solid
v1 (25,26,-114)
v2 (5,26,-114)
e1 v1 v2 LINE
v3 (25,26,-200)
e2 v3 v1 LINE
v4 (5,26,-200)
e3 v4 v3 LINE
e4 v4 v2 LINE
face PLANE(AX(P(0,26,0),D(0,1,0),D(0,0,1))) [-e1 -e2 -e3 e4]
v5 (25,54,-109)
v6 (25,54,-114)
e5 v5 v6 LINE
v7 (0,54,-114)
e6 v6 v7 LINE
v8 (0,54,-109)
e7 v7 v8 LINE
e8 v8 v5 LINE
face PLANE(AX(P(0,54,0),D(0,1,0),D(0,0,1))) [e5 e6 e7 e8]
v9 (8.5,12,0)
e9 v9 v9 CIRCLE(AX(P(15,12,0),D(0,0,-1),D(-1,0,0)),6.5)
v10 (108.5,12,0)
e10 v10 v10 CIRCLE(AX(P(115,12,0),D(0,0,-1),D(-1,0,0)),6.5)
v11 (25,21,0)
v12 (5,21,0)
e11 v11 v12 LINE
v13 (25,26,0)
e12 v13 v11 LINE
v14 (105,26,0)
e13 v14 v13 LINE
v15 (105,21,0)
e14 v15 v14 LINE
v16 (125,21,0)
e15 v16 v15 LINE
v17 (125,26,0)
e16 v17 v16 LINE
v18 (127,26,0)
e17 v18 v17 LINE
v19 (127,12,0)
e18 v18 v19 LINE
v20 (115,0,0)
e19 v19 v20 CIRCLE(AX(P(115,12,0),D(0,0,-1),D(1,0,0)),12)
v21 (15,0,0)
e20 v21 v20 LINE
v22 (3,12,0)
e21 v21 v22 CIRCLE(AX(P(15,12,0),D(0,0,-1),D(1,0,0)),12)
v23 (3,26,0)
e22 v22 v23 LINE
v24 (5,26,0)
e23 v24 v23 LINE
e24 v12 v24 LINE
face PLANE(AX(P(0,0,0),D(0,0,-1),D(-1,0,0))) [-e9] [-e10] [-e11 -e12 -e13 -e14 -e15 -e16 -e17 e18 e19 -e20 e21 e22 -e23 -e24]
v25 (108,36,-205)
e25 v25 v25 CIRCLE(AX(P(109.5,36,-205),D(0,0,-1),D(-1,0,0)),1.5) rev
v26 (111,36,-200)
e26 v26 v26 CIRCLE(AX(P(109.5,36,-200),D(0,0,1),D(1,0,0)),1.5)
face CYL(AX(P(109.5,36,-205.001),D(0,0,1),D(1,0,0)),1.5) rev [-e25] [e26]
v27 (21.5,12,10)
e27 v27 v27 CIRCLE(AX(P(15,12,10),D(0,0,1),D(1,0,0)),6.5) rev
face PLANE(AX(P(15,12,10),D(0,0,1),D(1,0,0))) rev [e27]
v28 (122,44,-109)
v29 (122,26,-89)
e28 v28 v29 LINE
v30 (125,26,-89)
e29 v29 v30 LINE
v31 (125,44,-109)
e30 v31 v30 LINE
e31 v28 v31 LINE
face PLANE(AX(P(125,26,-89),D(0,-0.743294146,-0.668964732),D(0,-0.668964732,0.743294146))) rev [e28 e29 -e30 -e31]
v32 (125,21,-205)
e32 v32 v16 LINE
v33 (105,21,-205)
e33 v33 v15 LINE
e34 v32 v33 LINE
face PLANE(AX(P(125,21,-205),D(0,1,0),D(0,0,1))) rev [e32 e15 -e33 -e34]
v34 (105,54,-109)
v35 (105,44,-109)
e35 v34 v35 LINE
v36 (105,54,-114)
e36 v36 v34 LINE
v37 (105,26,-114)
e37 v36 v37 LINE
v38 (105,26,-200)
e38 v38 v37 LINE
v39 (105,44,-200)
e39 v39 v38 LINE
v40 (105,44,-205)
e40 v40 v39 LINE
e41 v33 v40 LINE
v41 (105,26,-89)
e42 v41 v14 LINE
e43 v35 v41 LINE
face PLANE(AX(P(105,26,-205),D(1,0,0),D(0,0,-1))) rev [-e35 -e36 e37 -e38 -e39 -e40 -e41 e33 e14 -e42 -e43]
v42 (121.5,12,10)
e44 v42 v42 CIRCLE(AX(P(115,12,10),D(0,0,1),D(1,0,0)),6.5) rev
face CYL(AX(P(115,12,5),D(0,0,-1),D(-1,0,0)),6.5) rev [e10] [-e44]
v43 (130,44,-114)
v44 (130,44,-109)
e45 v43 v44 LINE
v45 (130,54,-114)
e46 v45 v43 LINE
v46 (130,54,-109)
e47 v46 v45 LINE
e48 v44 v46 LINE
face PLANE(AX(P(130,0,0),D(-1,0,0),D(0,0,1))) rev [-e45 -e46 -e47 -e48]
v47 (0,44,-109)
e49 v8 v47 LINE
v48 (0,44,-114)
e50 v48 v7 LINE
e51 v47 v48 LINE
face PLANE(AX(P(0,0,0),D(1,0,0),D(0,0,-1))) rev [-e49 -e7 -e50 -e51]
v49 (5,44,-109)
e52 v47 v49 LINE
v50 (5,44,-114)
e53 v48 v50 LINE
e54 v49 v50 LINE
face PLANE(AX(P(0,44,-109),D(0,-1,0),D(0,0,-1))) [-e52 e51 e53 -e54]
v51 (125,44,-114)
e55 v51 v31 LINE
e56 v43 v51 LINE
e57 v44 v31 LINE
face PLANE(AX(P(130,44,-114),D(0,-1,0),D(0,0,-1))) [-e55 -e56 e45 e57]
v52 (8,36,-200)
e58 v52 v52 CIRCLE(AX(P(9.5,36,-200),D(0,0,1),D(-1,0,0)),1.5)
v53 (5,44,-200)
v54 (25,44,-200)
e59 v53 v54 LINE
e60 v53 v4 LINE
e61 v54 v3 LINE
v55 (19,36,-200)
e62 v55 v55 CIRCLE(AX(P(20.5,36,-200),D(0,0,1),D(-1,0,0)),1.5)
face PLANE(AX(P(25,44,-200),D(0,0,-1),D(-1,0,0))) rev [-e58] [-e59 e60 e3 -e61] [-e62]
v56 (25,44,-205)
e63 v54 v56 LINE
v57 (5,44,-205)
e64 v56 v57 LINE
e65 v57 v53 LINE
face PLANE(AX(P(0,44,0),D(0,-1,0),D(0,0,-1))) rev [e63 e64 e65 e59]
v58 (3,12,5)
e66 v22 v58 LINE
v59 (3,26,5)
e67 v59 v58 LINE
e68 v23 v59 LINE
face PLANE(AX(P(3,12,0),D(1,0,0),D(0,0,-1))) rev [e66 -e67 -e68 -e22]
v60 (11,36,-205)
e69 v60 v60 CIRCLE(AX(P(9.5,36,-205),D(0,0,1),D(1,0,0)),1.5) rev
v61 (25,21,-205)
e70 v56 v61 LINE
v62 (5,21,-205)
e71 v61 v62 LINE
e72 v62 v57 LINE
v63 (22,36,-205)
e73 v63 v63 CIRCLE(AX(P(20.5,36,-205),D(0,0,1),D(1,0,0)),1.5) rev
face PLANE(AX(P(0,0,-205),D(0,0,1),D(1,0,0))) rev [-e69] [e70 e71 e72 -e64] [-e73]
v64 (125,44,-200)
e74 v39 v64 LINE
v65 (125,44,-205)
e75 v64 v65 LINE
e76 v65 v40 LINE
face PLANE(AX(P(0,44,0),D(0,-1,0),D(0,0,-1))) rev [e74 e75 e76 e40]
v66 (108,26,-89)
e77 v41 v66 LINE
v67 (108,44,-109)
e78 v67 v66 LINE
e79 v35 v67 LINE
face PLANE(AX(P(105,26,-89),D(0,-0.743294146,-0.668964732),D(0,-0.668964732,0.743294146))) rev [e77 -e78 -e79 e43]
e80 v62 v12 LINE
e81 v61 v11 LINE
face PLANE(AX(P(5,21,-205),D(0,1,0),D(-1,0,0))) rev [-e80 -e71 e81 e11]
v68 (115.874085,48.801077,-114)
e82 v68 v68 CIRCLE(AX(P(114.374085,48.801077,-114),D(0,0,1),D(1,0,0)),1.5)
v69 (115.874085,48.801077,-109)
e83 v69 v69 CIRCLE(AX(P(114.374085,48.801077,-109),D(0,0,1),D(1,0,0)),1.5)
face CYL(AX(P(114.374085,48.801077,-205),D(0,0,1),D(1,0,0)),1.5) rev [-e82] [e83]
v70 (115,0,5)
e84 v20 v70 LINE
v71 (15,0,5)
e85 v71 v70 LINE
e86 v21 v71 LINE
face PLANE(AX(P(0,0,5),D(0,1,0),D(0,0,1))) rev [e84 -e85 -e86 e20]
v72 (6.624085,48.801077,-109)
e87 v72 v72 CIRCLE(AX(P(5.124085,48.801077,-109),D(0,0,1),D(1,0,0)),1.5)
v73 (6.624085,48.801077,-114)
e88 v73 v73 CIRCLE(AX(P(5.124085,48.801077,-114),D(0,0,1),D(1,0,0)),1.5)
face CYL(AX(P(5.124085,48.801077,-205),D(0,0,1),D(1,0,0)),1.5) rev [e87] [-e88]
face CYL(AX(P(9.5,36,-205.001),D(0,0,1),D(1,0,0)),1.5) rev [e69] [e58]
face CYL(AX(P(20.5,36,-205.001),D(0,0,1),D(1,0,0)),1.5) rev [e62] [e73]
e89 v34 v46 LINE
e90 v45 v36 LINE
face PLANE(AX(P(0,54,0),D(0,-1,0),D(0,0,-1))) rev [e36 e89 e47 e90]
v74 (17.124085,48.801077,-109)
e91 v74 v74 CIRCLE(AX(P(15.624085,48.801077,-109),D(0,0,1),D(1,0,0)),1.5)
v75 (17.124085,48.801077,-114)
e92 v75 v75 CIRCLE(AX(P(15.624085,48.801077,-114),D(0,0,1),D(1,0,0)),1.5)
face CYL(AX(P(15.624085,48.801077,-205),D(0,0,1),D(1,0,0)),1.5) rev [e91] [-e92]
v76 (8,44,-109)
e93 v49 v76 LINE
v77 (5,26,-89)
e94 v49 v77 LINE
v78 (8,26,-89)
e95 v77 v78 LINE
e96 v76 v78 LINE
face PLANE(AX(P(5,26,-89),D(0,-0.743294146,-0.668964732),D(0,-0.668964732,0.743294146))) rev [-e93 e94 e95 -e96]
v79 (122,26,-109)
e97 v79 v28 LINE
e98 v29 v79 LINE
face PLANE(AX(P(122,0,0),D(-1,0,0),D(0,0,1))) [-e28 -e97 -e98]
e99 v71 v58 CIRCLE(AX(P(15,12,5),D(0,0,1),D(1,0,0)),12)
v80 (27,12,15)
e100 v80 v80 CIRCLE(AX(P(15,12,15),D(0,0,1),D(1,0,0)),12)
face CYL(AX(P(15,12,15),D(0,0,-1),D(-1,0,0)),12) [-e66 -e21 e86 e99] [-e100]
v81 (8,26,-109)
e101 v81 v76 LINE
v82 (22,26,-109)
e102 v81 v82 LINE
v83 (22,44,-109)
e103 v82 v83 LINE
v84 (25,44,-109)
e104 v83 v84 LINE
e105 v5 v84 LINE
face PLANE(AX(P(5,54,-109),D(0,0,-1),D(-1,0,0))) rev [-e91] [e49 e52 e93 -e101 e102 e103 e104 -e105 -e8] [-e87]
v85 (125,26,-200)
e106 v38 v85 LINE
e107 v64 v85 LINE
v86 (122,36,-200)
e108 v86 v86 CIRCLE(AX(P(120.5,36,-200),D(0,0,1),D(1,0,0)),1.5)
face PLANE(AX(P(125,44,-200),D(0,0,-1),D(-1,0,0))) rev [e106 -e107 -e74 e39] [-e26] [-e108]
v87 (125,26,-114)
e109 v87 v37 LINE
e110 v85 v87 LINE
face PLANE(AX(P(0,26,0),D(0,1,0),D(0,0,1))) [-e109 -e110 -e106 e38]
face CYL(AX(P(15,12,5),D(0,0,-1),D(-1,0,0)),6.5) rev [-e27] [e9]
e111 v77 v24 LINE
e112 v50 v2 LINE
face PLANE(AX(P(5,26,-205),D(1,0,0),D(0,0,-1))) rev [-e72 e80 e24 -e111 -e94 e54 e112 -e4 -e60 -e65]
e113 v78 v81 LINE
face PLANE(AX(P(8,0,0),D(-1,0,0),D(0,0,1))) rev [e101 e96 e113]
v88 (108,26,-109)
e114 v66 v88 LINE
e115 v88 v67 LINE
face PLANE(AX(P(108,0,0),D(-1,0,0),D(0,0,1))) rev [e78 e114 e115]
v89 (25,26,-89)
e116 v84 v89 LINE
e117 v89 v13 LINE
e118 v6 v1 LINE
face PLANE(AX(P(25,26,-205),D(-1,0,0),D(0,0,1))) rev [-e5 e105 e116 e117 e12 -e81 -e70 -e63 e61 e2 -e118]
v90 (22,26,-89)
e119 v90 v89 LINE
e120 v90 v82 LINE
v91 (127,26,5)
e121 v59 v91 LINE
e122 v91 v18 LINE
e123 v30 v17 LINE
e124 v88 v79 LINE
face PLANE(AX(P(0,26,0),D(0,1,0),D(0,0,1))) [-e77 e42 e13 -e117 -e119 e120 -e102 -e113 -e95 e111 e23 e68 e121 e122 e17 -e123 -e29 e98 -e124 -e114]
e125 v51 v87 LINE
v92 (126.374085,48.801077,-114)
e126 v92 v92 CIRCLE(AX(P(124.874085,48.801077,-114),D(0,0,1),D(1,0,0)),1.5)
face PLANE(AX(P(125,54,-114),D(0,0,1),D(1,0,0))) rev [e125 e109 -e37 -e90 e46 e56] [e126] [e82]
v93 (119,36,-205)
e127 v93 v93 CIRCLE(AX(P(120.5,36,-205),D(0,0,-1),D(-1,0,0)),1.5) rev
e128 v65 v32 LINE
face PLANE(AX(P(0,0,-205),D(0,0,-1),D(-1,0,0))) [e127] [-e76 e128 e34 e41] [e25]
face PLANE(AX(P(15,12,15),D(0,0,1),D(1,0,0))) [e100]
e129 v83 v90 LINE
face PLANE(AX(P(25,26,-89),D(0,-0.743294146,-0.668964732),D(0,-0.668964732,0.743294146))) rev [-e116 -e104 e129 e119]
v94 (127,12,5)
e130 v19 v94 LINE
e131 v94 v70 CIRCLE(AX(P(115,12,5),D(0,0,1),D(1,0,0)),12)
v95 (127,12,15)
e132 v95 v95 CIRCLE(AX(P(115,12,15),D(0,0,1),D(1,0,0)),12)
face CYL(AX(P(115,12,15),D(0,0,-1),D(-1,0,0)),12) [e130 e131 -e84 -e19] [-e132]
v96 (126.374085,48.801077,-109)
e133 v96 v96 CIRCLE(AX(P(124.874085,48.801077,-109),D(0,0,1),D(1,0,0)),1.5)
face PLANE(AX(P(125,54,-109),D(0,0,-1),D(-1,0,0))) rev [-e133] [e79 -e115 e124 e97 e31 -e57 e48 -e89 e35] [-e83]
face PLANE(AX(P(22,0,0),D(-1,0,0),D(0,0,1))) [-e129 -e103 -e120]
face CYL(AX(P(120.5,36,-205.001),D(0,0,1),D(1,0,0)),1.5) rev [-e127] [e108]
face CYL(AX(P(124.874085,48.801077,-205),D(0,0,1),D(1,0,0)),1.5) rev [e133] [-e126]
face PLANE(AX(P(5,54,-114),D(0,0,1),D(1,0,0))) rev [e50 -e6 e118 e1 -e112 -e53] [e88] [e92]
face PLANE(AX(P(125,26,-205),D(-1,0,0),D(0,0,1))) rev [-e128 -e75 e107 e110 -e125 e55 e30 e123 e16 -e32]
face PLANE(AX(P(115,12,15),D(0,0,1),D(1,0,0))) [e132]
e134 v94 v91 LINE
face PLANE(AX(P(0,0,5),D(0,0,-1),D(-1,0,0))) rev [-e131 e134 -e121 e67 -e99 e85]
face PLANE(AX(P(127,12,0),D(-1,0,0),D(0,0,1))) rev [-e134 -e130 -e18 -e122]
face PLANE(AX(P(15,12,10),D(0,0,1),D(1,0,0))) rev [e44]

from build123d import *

# Parameters (mm, degrees)
SKETCH1_W               = 130
SKETCH1_H               = 24
BOSS_EXTRUDE1_DEPTH     = 5
CUT_EXTRUDE1_DEPTH      = 133.291345144
CUT_EXTRUDE1_DEPTH_BACK = 133.291345144
SKETCH2_R               = 6.5
SKETCH3_R               = 12
BOSS_EXTRUDE3_DEPTH     = 10
SKETCH4_R               = 6.5
CUT_EXTRUDE2_DEPTH      = 5
CUT_EXTRUDE3_DEPTH      = 133.574507353
CUT_EXTRUDE3_DEPTH_BACK = 133.574507353
BOSS_EXTRUDE4_DEPTH     = 2
SKETCH7_W               = 20
SKETCH7_H               = 5
BOSS_EXTRUDE5_DEPTH     = 205
SKETCH8_W               = 20
SKETCH8_H               = 5
BOSS_EXTRUDE6_DEPTH     = 28
SKETCH9_W               = 20
SKETCH9_H               = 5
BOSS_EXTRUDE7_DEPTH     = 18
SKETCH10_W              = 5
SKETCH10_H              = 10
BOSS_EXTRUDE8_DEPTH     = 25
SKETCH11_W              = 5
SKETCH11_H              = 10
BOSS_EXTRUDE9_DEPTH     = 25
SKETCH12_R              = 1.5
CUT_EXTRUDE4_DEPTH      = 188.59530911
THICKEN1_T2             = 3
THICKEN2_START          = 22
THICKEN2_DEPTH          = 3
THICKEN3_START          = 5
THICKEN3_DEPTH          = 3
THICKEN4_START          = 105
THICKEN4_DEPTH          = 3
CUT_EXTRUDE5_REACH      = 258.984
SKETCH14_R              = 1.5


# Read off the part's stored shape, not the designer's step: Thicken2, Thicken3, Thicken4
with BuildPart() as part:
    # Sketch1 → Boss-Extrude1 (new body)
    with BuildSketch(Plane.XY):
        with Locations((65, 12)):
            Rectangle(SKETCH1_W, SKETCH1_H)
    extrude(amount=BOSS_EXTRUDE1_DEPTH)

    # Sketch2 → Cut-Extrude1 (cut, two sides: drawn at the far end of the back side and taken through both)
    with BuildSketch(Plane(origin=(0, 0, 0), x_dir=(-1, 0, 0), z_dir=(0, 0, -1)).offset(-CUT_EXTRUDE1_DEPTH_BACK)):
        with Locations((-15, 12)):
            Circle(SKETCH2_R)
        with Locations((-115, 12)):
            Circle(SKETCH2_R)
    extrude(amount=CUT_EXTRUDE1_DEPTH + CUT_EXTRUDE1_DEPTH_BACK, mode=Mode.SUBTRACT)

    # Sketch3 → Boss-Extrude3 (add)
    with BuildSketch(Plane.XY.offset(5)):
        with Locations(Location((15, 12, 0), (0, 0, 270))):
            Circle(SKETCH3_R)
        with Locations(Location((115, 12, 0), (0, 0, 270))):
            Circle(SKETCH3_R)
    extrude(amount=BOSS_EXTRUDE3_DEPTH)

    # Sketch4 → Cut-Extrude2 (cut)
    with BuildSketch(Plane(origin=(0, 0, 5), x_dir=(-1, 0, 0), z_dir=(0, 0, -1))):
        with Locations((-15, 12)):
            Circle(SKETCH4_R)
        with Locations((-115, 12)):
            Circle(SKETCH4_R)
    extrude(amount=-CUT_EXTRUDE2_DEPTH, mode=Mode.SUBTRACT)

    # Sketch5 → Cut-Extrude3 (cut, two sides: drawn at the far end of the back side and taken through both)
    with BuildSketch(Plane.XY.offset(5).offset(-CUT_EXTRUDE3_DEPTH_BACK)):
        with BuildLine():
            Line((3, 24), (0, 24))
            Line((0, 24), (0, 0))
            Line((0, 0), (15, 0))
            ThreePointArc((15, 0), (6.514718626, 3.514718626), (3, 12))
            Line((3, 12), (3, 24))
        make_face()
        with BuildLine():
            Line((115, 0), (130, 0))
            Line((130, 0), (130, 24))
            Line((130, 24), (127, 24))
            Line((127, 24), (127, 12))
            ThreePointArc((127, 12), (123.485281374, 3.514718626), (115, 0))
        make_face()
    extrude(amount=CUT_EXTRUDE3_DEPTH + CUT_EXTRUDE3_DEPTH_BACK, mode=Mode.SUBTRACT)

    # Sketch6 → Boss-Extrude4 (add)
    with BuildSketch(Plane(origin=(0, 24, 0), x_dir=(1, 0, 0), z_dir=(0, 1, 0))):
        Polygon((127, 0), (3, 0), (3, -5), (15, -5), (115, -5), (127, -5), align=None)
    extrude(amount=BOSS_EXTRUDE4_DEPTH)

    # Sketch7 → Boss-Extrude5 (add)
    with BuildSketch(Plane(origin=(0, 0, 0), x_dir=(-1, 0, 0), z_dir=(0, 0, -1))):
        with Locations((-115, 23.5)):
            Rectangle(SKETCH7_W, SKETCH7_H)
        with Locations((-15, 23.5)):
            Rectangle(SKETCH7_W, SKETCH7_H)
    extrude(amount=BOSS_EXTRUDE5_DEPTH)

    # Sketch8 → Boss-Extrude6 (add)
    with BuildSketch(Plane(origin=(0, 26, 0), x_dir=(1, 0, 0), z_dir=(0, 1, 0))):
        with Locations((115, 111.5)):
            Rectangle(SKETCH8_W, SKETCH8_H)
        with Locations((15, 111.5)):
            Rectangle(SKETCH8_W, SKETCH8_H)
    extrude(amount=BOSS_EXTRUDE6_DEPTH)

    # Sketch9 → Boss-Extrude7 (add)
    with BuildSketch(Plane(origin=(0, 26, 0), x_dir=(1, 0, 0), z_dir=(0, 1, 0))):
        with Locations((115, 202.5)):
            Rectangle(SKETCH9_W, SKETCH9_H)
        with Locations((15, 202.5)):
            Rectangle(SKETCH9_W, SKETCH9_H)
    extrude(amount=BOSS_EXTRUDE7_DEPTH)

    # Sketch10 → Boss-Extrude8 (add)
    with BuildSketch(Plane.ZY.offset(-105)):
        with Locations((-111.5, 49)):
            Rectangle(SKETCH10_W, SKETCH10_H)
    extrude(amount=-BOSS_EXTRUDE8_DEPTH)

    # Sketch11 → Boss-Extrude9 (add)
    with BuildSketch(Plane(origin=(25, 0, 0), x_dir=(0, 0, -1), z_dir=(1, 0, 0))):
        with Locations((111.5, 49)):
            Rectangle(SKETCH11_W, SKETCH11_H)
    extrude(amount=-BOSS_EXTRUDE9_DEPTH)

    # Sketch12 → Cut-Extrude4 (cut, through all)
    with BuildSketch(Plane.XY.offset(-109)):
        with Locations((124.874085346, 48.801077027)):
            Circle(SKETCH12_R)
        with Locations((114.374085346, 48.801077027)):
            Circle(SKETCH12_R)
        with Locations((15.624085346, 48.801077027)):
            Circle(SKETCH12_R)
        with Locations((5.124085346, 48.801077027)):
            Circle(SKETCH12_R)
    extrude(amount=-CUT_EXTRUDE4_DEPTH, mode=Mode.SUBTRACT)

    # Sketch13 → Surface-Plane1: a flat surface bounded by the sketch
    with BuildSketch(Plane(origin=(125, 0, 0), x_dir=(0, 0, -1), z_dir=(1, 0, 0)), mode=Mode.PRIVATE) as surface_plane1_1_region:
        Polygon((109, 44), (109, 26), (89, 26), align=None)
    surface_plane1_1 = surface_plane1_1_region.sketch.faces()[0]
    add(Solid.thicken(surface_plane1_1, -THICKEN1_T2))

    # Thicken2 outline → Thicken2 (add)
    with BuildSketch(Plane.YZ.offset(THICKEN2_START)):
        Polygon((44, -109), (26, -89), (26, -109), align=None)
    extrude(amount=THICKEN2_DEPTH)

    # Thicken3 outline → Thicken3 (add)
    with BuildSketch(Plane.YZ.offset(THICKEN3_START)):
        Polygon((44, -109), (26, -89), (26, -109), align=None)
    extrude(amount=THICKEN3_DEPTH)

    # Thicken4 outline → Thicken4 (add)
    with BuildSketch(Plane.YZ.offset(THICKEN4_START)):
        Polygon((44, -109), (26, -89), (26, -109), align=None)
    extrude(amount=THICKEN4_DEPTH)

    # Sketch14 → Cut-Extrude5 (cut, up to next)
    with BuildSketch(Plane.XY.offset(-200), mode=Mode.PRIVATE) as cut_extrude5_sk1:
        with Locations((109.5, 36)):
            Circle(SKETCH14_R)
    cut_extrude5_tool1 = extrude(cut_extrude5_sk1.sketch, amount=-CUT_EXTRUDE5_REACH, mode=Mode.PRIVATE) & part.part
    # Sketch14 → Cut-Extrude5 (cut, up to next)
    with BuildSketch(Plane.XY.offset(-200), mode=Mode.PRIVATE) as cut_extrude5_sk2:
        with Locations((120.5, 36)):
            Circle(SKETCH14_R)
    cut_extrude5_tool2 = extrude(cut_extrude5_sk2.sketch, amount=-CUT_EXTRUDE5_REACH, mode=Mode.PRIVATE) & part.part
    # Sketch14 → Cut-Extrude5 (cut, up to next)
    with BuildSketch(Plane.XY.offset(-200), mode=Mode.PRIVATE) as cut_extrude5_sk3:
        with Locations((9.5, 36)):
            Circle(SKETCH14_R)
    cut_extrude5_tool3 = extrude(cut_extrude5_sk3.sketch, amount=-CUT_EXTRUDE5_REACH, mode=Mode.PRIVATE) & part.part
    # Sketch14 → Cut-Extrude5 (cut, up to next)
    with BuildSketch(Plane.XY.offset(-200), mode=Mode.PRIVATE) as cut_extrude5_sk4:
        with Locations((20.5, 36)):
            Circle(SKETCH14_R)
    cut_extrude5_tool4 = extrude(cut_extrude5_sk4.sketch, amount=-CUT_EXTRUDE5_REACH, mode=Mode.PRIVATE) & part.part
    add(cut_extrude5_tool1.solids().sort_by_distance((109.5, 36, -200))[0], mode=Mode.SUBTRACT)
    add(cut_extrude5_tool2.solids().sort_by_distance((120.5, 36, -200))[0], mode=Mode.SUBTRACT)
    add(cut_extrude5_tool3.solids().sort_by_distance((9.5, 36, -200))[0], mode=Mode.SUBTRACT)
    add(cut_extrude5_tool4.solids().sort_by_distance((20.5, 36, -200))[0], mode=Mode.SUBTRACT)


solid = part.part
